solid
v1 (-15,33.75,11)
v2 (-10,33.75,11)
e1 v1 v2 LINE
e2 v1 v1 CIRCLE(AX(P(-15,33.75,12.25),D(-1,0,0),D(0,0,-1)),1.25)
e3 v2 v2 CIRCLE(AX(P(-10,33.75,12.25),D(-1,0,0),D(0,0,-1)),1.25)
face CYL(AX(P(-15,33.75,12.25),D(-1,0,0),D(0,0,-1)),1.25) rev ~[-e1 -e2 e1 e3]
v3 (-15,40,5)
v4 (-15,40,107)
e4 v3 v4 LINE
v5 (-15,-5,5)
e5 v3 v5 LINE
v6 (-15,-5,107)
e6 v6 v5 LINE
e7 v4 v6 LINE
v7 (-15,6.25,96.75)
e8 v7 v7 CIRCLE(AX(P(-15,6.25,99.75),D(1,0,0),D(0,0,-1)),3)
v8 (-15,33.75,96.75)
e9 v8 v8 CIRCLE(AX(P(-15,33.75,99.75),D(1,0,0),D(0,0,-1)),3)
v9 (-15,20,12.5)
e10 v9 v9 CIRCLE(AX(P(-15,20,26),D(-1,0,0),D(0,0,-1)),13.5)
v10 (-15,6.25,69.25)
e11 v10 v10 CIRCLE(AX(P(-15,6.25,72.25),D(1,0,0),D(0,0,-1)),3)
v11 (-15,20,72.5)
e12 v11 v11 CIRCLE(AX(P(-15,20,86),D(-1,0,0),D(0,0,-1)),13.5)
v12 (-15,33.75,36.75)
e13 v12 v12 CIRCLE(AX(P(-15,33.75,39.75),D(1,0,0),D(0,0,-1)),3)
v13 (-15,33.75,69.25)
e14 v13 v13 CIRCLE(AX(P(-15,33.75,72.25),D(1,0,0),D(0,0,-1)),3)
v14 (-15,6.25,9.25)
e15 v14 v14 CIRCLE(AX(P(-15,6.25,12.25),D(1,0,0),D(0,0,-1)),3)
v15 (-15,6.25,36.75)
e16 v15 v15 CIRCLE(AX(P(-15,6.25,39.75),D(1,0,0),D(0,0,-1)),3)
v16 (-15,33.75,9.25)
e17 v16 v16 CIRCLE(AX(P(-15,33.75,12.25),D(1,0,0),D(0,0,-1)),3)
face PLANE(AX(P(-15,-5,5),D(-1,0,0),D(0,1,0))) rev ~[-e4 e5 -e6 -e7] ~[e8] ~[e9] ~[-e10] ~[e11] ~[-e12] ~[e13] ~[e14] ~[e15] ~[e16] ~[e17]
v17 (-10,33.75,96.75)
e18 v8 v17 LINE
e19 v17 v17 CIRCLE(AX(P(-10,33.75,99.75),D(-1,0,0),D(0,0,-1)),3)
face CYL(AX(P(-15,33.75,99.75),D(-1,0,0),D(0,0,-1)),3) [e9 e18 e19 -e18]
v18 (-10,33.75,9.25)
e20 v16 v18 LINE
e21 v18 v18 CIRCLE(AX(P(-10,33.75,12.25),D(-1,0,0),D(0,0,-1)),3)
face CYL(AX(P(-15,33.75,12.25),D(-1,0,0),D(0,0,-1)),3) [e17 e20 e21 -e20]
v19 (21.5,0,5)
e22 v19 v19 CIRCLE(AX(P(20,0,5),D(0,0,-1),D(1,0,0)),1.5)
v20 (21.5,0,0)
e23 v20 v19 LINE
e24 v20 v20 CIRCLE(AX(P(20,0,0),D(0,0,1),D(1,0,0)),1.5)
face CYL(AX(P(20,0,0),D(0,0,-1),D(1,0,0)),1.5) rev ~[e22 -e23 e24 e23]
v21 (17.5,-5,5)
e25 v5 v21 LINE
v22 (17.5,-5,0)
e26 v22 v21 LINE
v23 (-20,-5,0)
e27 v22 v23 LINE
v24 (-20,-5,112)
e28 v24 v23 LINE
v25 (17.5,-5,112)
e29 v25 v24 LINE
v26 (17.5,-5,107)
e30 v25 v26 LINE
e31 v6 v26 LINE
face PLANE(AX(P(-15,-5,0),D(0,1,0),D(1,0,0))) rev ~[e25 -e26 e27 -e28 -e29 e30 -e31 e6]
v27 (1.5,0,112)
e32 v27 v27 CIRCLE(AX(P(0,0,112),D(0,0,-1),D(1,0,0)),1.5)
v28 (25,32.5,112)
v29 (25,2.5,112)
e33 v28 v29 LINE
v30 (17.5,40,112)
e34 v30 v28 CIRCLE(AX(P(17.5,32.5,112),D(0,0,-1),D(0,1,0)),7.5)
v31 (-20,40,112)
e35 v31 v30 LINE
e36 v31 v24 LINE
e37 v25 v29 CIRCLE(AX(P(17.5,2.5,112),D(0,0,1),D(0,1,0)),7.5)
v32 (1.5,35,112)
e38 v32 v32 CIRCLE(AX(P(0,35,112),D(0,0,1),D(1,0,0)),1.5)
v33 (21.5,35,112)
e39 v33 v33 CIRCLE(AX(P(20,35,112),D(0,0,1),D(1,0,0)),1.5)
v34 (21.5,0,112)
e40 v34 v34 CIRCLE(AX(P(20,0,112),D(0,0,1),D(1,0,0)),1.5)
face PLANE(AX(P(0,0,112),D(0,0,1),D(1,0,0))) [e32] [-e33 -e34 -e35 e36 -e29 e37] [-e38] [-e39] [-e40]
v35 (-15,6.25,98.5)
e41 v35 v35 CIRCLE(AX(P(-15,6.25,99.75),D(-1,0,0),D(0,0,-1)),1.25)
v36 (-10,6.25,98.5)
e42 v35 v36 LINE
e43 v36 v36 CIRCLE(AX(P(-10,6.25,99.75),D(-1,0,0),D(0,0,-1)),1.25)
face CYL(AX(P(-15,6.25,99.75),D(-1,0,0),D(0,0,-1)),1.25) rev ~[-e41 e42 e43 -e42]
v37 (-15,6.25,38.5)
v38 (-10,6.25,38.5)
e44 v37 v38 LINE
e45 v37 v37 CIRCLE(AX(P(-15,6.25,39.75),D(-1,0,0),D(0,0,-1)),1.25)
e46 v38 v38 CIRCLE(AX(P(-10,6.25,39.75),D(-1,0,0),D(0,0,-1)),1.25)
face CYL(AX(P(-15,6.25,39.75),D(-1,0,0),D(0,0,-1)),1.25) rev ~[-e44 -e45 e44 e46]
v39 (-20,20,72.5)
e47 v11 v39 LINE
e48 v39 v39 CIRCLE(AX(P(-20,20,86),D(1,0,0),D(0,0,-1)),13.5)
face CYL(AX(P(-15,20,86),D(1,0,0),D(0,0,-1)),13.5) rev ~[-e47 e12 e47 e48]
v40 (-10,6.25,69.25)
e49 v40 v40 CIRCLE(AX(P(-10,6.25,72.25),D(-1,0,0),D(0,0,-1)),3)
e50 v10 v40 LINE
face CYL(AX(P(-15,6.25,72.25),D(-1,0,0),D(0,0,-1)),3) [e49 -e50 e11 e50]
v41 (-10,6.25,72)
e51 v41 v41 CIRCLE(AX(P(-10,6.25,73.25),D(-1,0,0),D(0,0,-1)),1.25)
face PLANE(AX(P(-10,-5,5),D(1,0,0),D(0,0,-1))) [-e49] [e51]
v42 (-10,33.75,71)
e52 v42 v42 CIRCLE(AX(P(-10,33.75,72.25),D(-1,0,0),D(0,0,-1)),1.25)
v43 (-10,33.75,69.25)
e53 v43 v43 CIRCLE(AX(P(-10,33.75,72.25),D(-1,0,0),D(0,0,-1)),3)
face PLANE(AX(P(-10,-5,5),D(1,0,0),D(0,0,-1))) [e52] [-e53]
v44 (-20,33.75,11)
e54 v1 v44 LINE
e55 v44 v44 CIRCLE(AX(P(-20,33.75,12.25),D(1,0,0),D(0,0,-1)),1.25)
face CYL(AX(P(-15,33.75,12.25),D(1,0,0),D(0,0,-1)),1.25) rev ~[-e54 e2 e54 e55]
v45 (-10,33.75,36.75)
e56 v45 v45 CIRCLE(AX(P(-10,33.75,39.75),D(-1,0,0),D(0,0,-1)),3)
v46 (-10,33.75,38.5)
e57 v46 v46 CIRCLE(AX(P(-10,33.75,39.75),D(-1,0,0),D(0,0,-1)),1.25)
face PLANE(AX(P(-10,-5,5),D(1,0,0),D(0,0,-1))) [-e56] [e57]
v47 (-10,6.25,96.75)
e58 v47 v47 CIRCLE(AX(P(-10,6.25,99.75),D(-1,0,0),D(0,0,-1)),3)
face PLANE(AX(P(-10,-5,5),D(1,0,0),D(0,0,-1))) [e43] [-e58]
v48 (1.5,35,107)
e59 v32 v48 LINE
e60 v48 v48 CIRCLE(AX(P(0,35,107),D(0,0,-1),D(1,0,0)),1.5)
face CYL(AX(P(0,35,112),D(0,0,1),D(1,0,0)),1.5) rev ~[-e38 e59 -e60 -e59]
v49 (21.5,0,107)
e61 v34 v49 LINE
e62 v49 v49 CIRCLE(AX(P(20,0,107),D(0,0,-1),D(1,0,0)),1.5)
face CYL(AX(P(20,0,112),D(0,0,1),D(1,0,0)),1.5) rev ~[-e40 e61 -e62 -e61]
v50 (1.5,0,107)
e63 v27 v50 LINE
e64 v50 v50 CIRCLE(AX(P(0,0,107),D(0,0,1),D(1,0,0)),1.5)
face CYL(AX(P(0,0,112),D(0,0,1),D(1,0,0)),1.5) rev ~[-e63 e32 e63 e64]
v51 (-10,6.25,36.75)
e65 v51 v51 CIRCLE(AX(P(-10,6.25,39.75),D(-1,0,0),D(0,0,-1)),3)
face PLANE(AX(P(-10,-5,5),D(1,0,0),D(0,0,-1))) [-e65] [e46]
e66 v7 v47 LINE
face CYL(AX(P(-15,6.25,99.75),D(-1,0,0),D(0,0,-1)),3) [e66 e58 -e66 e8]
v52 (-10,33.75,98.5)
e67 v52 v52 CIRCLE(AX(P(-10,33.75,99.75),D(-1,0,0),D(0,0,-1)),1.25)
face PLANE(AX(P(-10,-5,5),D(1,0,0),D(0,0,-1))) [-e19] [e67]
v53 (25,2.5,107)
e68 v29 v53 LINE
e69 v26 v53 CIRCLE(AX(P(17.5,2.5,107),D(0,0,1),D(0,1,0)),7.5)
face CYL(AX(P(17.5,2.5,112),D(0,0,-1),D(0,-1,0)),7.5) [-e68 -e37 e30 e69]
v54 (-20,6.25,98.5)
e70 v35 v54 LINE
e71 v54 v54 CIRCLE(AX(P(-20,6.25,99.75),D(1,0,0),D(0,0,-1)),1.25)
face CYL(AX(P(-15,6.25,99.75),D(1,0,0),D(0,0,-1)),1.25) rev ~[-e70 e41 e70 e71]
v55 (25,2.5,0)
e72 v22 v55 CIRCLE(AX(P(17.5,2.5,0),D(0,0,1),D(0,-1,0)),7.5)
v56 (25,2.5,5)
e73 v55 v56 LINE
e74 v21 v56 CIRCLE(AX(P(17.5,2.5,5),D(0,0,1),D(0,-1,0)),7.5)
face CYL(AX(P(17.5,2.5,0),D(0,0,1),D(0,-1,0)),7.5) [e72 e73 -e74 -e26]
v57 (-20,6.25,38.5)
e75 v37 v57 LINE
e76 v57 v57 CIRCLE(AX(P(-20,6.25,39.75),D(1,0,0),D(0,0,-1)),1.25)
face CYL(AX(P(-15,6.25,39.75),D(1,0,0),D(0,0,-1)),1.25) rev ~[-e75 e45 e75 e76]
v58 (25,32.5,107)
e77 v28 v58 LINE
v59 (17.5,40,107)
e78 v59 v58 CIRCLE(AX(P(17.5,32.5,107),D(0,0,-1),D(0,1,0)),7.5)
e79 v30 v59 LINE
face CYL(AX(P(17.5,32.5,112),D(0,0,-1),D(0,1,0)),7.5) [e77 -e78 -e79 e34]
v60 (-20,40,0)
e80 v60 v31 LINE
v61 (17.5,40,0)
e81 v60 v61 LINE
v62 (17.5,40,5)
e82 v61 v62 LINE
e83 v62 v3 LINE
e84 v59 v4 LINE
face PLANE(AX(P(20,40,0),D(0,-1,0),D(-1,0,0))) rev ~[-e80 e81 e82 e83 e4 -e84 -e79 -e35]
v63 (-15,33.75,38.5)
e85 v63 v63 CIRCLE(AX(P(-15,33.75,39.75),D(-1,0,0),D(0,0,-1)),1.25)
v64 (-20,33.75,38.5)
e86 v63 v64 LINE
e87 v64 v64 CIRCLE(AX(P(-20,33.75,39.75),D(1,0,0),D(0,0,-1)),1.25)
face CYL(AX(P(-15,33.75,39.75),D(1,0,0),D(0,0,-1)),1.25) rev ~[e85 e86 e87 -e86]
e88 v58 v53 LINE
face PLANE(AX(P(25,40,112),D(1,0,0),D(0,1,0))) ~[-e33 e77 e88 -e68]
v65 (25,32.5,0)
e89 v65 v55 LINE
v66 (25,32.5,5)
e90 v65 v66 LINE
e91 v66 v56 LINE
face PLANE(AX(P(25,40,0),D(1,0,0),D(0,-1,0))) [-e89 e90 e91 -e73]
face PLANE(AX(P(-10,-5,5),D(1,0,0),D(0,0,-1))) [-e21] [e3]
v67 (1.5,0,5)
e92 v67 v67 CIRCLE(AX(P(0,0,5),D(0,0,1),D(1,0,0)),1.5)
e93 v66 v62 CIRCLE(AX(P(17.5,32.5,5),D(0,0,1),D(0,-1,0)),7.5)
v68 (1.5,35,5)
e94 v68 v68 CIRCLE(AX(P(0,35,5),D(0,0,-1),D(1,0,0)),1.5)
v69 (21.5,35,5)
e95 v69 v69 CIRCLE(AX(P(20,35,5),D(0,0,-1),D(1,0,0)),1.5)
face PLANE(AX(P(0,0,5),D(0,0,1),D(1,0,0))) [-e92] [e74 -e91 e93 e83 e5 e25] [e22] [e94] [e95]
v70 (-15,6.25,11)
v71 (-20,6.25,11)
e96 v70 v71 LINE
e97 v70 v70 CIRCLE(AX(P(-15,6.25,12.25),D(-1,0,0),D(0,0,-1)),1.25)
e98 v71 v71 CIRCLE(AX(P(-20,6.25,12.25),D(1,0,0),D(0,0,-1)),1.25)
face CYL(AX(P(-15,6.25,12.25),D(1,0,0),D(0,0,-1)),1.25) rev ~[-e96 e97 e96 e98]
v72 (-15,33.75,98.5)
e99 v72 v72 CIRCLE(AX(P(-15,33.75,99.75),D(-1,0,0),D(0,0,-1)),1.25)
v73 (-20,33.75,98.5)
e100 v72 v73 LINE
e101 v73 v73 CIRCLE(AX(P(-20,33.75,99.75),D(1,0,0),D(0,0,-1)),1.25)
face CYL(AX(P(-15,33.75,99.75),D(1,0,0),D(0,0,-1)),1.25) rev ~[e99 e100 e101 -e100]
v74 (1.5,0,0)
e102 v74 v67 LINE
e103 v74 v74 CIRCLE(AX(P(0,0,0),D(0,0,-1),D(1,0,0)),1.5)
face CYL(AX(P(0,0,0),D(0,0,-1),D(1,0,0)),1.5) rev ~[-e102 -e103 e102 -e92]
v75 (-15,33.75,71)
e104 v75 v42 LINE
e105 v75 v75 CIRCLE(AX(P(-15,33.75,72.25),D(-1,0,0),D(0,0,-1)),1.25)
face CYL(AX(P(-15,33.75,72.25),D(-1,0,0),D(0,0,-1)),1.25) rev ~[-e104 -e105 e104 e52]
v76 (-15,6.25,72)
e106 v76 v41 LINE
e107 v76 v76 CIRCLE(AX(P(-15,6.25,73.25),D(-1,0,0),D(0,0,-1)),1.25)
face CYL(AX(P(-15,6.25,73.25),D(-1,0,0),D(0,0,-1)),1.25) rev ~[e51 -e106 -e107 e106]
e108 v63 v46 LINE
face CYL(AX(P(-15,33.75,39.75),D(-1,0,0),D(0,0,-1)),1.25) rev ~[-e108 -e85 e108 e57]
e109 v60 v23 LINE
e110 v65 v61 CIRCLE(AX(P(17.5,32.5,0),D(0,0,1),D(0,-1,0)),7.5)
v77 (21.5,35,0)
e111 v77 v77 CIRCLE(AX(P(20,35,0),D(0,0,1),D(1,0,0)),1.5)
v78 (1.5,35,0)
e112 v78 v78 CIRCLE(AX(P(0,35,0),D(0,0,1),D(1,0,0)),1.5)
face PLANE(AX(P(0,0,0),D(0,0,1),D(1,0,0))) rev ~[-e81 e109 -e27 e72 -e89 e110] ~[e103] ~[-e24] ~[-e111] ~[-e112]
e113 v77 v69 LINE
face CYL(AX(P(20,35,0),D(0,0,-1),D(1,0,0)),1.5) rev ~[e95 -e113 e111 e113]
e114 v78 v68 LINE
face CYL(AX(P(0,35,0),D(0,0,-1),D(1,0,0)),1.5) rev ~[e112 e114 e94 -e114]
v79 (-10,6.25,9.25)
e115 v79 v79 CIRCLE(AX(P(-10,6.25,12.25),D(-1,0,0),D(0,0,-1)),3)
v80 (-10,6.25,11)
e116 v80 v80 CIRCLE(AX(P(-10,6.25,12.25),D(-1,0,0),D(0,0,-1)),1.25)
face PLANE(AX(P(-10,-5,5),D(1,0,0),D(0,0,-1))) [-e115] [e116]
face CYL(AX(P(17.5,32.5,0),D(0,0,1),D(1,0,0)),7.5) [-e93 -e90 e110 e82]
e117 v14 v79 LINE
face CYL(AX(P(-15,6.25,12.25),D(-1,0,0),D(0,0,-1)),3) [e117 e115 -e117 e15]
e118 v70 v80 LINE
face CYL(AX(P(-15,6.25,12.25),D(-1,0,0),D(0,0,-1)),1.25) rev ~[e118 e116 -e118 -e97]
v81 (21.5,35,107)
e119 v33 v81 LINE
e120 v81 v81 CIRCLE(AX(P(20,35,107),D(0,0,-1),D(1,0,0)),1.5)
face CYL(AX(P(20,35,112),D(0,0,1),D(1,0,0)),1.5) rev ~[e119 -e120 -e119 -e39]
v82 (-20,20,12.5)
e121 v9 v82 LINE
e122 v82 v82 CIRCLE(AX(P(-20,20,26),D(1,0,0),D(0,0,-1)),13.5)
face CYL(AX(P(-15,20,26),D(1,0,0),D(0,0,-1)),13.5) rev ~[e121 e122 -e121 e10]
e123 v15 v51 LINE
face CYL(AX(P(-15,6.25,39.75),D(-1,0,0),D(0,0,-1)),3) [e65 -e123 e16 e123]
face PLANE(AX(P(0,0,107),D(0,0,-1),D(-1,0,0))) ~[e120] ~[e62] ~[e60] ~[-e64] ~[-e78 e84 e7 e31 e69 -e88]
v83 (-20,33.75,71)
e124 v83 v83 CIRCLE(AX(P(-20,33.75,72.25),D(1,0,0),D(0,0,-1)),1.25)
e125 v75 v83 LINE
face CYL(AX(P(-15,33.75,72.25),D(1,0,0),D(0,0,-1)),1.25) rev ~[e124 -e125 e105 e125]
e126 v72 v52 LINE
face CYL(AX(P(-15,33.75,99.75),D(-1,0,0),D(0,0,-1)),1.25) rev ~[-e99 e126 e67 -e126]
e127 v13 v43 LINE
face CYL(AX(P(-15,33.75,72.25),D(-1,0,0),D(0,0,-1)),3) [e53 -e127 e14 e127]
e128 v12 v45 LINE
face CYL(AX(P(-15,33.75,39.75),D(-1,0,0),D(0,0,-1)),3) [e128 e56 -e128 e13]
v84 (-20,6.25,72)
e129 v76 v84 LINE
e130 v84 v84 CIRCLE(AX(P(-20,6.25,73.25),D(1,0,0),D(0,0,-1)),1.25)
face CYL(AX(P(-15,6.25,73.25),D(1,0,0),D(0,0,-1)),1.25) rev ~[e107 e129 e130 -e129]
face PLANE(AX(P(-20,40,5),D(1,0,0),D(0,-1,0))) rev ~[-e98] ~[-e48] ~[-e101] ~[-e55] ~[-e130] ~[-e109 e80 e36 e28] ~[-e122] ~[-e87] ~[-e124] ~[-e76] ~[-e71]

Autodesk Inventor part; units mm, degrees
ref_plane "YZ Plane" through (0, 0, 0) normal (1, 0, 0) x (0, 1, 0)
ref_plane "XZ Plane" through (0, 0, 0) normal (0, 1, 0) x (-1, 0, 0)
sketch "Sketch1" plane through (0, 0, 0) normal (0, 0, 1) x (1, 0, 0)
  line L0 (0, 0) -> (20, 0)
  line L1 (20, 0) -> (20, 35)
  line L2 (20, 35) -> (0, 35)
  line L3 (0, 35) -> (0, 0)
  circle A0 centre (0, 35) radius 1.5
  circle A1 centre (20, 35) radius 1.5
  circle A2 centre (0, 0) radius 1.5
  circle A3 centre (20, 0) radius 1.5
  line L4 (0, 35) -> (20, 0)
  line L5 (-15, -5) -> (20, -5)
  line L6 (20, -5) -> (20, 40)
  line L7 (20, 40) -> (-15, 40)
  line L8 (-15, 40) -> (-15, -5)
  line L9 (20, 40) -> (25, 40)
  line L10 (25, 40) -> (25, -5)
  line L11 (25, -5) -> (20, -5)
  line L12 (20, -5) -> (20, 40)
  point P0 (10, 17.5)
  point P1 (20, 36.5)
  point P2 (20, 33.5)
  point P3 (20, 1.5)
  point P4 (20, -1.5)
  dimension "d0" = 35
  dimension "d1" = 20
  dimension "d2" = 3
  dimension "d3" = 3
  dimension "d4" = 3
  dimension "d5" = 3
  dimension "d6" = 5
  dimension "d7" = 15
  dimension "d45" = 5
  dimension "d46" = 45
  dimension "d47" = 10
extrude "Extrusion1" add sketch "Sketch1" along normal blind 5 contours A2 L3 A0 L4 A3 L0 | L0 A3 L6 L5 L8 L7 A1 L2 A0 L3 A2 | L4 A0 L2 A1 L1 A3 | A3 L1 A1 L6 L9 L10 L11
sketch "Sketch2" plane through (0, 0, 5) normal (0, 0, 1) x (1, 0, 0)
  line L0 (30, 40) -> (-15, 40) projected
  line L1 (-15, 40) -> (-20, 40)
  line L2 (-20, 40) -> (-20, -5)
  line L3 (-20, -5) -> (-15, -5)
  line L4 (-15, -5) -> (-15, 40)
  point P0 (0, 0)
  dimension "d10" = 5
extrude "Extrusion2" add sketch "Sketch2" along normal blind 107 and the other way blind 5
ref_plane "Work Plane2" through (0, 0, 56) normal (0, 0, -1) x (-1, 0, 0)
mirror "Mirror2" about plane through (0, 0, 56) normal (0, 0, -1) of "Extrusion1"
sketch "Sketch3" plane through (-15, -5, 5) normal (1, 0, 0) x (0, 0, -1)
  line L0 (-102, 45) -> (-102, 0) projected
  line L1 (-102, 25) -> (0, 25)
  line L2 (0, 45) -> (0, 0) projected
  circle A0 centre (-81, 25) radius 13.5
  circle A1 centre (-21, 25) radius 13.5
  line L3 (-94.75, 38.75) -> (-67.25, 38.75)
  line L4 (-67.25, 38.75) -> (-67.25, 11.25)
  line L5 (-67.25, 11.25) -> (-94.75, 11.25)
  line L6 (-94.75, 11.25) -> (-94.75, 38.75)
  line L7 (-94.75, 38.75) -> (-67.25, 11.25) construction
  line L8 (-67.25, 38.75) -> (-94.75, 11.25) construction
  line L9 (0, 45) -> (-102, 45) projected
  line L10 (-7.25, 11.25) -> (-34.75, 11.25)
  line L11 (-34.75, 11.25) -> (-34.75, 38.75)
  line L12 (-34.75, 38.75) -> (-7.25, 38.75)
  line L13 (-7.25, 38.75) -> (-7.25, 11.25)
  line L14 (-7.25, 11.25) -> (-34.75, 38.75) construction
  line L15 (-34.75, 11.25) -> (-7.25, 38.75) construction
  circle A2 centre (-94.75, 38.75) radius 3
  circle A3 centre (-67.25, 38.75) radius 3
  circle A4 centre (-67.25, 11.25) radius 3
  circle A5 centre (-94.75, 11.25) radius 3
  circle A6 centre (-34.75, 38.75) radius 3
  circle A7 centre (-7.25, 38.75) radius 3
  circle A8 centre (-7.25, 11.25) radius 3
  circle A9 centre (-34.75, 11.25) radius 3
  circle A10 centre (-94.75, 38.75) radius 1.25
  circle A11 centre (-67.25, 38.75) radius 1.25
  circle A12 centre (-68.25, 11.25) radius 1.25
  circle A13 centre (-94.75, 11.25) radius 1.25
  circle A14 centre (-34.75, 38.75) radius 1.25
  circle A15 centre (-7.25, 38.75) radius 1.25
  circle A16 centre (-34.75, 11.25) radius 1.25
  circle A17 centre (-7.25, 11.25) radius 1.25
  point P0 (5, 5)
  dimension "d16" = 27
  dimension "d17" = 27
  dimension "d18" = 27.5
  dimension "d19" = 27.5
  dimension "d20" = 20
  dimension "d21" = 21
  dimension "d22" = 21
  dimension "d23" = 27.5
  dimension "d24" = 27.5
  dimension "d25" = 6
  dimension "d26" = 6
  dimension "d27" = 6
  dimension "d28" = 6
  dimension "d29" = 6
  dimension "d30" = 6
  dimension "d31" = 6
  dimension "d32" = 6
  dimension "d33" = 2.5
  dimension "d34" = 2.5
  dimension "d35" = 2.5
  dimension "d36" = 2.5
  dimension "d37" = 2.5
  dimension "d38" = 2.5
  dimension "d39" = 2.5
  dimension "d40" = 2.5
extrude "Extrusion3" cut sketch "Sketch3" against normal blind 6 contours A0 L1 | L1 A0 | A13 L5 L6 | L6 L5 A13 | A10 L3 L6 | L6 L3 A10 | A1 L1 | L1 A1 | A15 L12 L13 | L13 L12 A15 | A17 L10 L13 | L13 L10 A17 | A12 L4 L5 | L5 L4 A12 | A11 L4 L3 | L3 L4 A11 | A14 L11 L12 | L12 L11 A14 | A16 L11 L10 | L10 L11 A16
extrude "Extrusion4" add sketch "Sketch3" along normal blind 5 contours A5 L5 A13 L6 | L6 A13 L5 A5 | A2 L3 A10 L6 | L6 A10 L3 A2 | A7 L12 A15 L13 | L13 A15 L12 A7 | A8 L10 A17 L13 | L13 A17 L10 A8 | A4 L4 A12 L5 | L5 A12 L4 A4 | A3 L4 A11 L3 | L3 A11 L4 A3 | A6 L11 A14 L12 | L12 A14 L11 A6 | A9 L11 A16 L10 | L10 A16 L11 A9
fillet "Fillet2" radius 7.5 4 edges at (25, 40, 2.5) (25, -5, 2.5) (25, -5, 109.5) (25, 40, 109.5)
equation "\"d41\" = d30"
properties part number "StereoVisionHolder_3"
